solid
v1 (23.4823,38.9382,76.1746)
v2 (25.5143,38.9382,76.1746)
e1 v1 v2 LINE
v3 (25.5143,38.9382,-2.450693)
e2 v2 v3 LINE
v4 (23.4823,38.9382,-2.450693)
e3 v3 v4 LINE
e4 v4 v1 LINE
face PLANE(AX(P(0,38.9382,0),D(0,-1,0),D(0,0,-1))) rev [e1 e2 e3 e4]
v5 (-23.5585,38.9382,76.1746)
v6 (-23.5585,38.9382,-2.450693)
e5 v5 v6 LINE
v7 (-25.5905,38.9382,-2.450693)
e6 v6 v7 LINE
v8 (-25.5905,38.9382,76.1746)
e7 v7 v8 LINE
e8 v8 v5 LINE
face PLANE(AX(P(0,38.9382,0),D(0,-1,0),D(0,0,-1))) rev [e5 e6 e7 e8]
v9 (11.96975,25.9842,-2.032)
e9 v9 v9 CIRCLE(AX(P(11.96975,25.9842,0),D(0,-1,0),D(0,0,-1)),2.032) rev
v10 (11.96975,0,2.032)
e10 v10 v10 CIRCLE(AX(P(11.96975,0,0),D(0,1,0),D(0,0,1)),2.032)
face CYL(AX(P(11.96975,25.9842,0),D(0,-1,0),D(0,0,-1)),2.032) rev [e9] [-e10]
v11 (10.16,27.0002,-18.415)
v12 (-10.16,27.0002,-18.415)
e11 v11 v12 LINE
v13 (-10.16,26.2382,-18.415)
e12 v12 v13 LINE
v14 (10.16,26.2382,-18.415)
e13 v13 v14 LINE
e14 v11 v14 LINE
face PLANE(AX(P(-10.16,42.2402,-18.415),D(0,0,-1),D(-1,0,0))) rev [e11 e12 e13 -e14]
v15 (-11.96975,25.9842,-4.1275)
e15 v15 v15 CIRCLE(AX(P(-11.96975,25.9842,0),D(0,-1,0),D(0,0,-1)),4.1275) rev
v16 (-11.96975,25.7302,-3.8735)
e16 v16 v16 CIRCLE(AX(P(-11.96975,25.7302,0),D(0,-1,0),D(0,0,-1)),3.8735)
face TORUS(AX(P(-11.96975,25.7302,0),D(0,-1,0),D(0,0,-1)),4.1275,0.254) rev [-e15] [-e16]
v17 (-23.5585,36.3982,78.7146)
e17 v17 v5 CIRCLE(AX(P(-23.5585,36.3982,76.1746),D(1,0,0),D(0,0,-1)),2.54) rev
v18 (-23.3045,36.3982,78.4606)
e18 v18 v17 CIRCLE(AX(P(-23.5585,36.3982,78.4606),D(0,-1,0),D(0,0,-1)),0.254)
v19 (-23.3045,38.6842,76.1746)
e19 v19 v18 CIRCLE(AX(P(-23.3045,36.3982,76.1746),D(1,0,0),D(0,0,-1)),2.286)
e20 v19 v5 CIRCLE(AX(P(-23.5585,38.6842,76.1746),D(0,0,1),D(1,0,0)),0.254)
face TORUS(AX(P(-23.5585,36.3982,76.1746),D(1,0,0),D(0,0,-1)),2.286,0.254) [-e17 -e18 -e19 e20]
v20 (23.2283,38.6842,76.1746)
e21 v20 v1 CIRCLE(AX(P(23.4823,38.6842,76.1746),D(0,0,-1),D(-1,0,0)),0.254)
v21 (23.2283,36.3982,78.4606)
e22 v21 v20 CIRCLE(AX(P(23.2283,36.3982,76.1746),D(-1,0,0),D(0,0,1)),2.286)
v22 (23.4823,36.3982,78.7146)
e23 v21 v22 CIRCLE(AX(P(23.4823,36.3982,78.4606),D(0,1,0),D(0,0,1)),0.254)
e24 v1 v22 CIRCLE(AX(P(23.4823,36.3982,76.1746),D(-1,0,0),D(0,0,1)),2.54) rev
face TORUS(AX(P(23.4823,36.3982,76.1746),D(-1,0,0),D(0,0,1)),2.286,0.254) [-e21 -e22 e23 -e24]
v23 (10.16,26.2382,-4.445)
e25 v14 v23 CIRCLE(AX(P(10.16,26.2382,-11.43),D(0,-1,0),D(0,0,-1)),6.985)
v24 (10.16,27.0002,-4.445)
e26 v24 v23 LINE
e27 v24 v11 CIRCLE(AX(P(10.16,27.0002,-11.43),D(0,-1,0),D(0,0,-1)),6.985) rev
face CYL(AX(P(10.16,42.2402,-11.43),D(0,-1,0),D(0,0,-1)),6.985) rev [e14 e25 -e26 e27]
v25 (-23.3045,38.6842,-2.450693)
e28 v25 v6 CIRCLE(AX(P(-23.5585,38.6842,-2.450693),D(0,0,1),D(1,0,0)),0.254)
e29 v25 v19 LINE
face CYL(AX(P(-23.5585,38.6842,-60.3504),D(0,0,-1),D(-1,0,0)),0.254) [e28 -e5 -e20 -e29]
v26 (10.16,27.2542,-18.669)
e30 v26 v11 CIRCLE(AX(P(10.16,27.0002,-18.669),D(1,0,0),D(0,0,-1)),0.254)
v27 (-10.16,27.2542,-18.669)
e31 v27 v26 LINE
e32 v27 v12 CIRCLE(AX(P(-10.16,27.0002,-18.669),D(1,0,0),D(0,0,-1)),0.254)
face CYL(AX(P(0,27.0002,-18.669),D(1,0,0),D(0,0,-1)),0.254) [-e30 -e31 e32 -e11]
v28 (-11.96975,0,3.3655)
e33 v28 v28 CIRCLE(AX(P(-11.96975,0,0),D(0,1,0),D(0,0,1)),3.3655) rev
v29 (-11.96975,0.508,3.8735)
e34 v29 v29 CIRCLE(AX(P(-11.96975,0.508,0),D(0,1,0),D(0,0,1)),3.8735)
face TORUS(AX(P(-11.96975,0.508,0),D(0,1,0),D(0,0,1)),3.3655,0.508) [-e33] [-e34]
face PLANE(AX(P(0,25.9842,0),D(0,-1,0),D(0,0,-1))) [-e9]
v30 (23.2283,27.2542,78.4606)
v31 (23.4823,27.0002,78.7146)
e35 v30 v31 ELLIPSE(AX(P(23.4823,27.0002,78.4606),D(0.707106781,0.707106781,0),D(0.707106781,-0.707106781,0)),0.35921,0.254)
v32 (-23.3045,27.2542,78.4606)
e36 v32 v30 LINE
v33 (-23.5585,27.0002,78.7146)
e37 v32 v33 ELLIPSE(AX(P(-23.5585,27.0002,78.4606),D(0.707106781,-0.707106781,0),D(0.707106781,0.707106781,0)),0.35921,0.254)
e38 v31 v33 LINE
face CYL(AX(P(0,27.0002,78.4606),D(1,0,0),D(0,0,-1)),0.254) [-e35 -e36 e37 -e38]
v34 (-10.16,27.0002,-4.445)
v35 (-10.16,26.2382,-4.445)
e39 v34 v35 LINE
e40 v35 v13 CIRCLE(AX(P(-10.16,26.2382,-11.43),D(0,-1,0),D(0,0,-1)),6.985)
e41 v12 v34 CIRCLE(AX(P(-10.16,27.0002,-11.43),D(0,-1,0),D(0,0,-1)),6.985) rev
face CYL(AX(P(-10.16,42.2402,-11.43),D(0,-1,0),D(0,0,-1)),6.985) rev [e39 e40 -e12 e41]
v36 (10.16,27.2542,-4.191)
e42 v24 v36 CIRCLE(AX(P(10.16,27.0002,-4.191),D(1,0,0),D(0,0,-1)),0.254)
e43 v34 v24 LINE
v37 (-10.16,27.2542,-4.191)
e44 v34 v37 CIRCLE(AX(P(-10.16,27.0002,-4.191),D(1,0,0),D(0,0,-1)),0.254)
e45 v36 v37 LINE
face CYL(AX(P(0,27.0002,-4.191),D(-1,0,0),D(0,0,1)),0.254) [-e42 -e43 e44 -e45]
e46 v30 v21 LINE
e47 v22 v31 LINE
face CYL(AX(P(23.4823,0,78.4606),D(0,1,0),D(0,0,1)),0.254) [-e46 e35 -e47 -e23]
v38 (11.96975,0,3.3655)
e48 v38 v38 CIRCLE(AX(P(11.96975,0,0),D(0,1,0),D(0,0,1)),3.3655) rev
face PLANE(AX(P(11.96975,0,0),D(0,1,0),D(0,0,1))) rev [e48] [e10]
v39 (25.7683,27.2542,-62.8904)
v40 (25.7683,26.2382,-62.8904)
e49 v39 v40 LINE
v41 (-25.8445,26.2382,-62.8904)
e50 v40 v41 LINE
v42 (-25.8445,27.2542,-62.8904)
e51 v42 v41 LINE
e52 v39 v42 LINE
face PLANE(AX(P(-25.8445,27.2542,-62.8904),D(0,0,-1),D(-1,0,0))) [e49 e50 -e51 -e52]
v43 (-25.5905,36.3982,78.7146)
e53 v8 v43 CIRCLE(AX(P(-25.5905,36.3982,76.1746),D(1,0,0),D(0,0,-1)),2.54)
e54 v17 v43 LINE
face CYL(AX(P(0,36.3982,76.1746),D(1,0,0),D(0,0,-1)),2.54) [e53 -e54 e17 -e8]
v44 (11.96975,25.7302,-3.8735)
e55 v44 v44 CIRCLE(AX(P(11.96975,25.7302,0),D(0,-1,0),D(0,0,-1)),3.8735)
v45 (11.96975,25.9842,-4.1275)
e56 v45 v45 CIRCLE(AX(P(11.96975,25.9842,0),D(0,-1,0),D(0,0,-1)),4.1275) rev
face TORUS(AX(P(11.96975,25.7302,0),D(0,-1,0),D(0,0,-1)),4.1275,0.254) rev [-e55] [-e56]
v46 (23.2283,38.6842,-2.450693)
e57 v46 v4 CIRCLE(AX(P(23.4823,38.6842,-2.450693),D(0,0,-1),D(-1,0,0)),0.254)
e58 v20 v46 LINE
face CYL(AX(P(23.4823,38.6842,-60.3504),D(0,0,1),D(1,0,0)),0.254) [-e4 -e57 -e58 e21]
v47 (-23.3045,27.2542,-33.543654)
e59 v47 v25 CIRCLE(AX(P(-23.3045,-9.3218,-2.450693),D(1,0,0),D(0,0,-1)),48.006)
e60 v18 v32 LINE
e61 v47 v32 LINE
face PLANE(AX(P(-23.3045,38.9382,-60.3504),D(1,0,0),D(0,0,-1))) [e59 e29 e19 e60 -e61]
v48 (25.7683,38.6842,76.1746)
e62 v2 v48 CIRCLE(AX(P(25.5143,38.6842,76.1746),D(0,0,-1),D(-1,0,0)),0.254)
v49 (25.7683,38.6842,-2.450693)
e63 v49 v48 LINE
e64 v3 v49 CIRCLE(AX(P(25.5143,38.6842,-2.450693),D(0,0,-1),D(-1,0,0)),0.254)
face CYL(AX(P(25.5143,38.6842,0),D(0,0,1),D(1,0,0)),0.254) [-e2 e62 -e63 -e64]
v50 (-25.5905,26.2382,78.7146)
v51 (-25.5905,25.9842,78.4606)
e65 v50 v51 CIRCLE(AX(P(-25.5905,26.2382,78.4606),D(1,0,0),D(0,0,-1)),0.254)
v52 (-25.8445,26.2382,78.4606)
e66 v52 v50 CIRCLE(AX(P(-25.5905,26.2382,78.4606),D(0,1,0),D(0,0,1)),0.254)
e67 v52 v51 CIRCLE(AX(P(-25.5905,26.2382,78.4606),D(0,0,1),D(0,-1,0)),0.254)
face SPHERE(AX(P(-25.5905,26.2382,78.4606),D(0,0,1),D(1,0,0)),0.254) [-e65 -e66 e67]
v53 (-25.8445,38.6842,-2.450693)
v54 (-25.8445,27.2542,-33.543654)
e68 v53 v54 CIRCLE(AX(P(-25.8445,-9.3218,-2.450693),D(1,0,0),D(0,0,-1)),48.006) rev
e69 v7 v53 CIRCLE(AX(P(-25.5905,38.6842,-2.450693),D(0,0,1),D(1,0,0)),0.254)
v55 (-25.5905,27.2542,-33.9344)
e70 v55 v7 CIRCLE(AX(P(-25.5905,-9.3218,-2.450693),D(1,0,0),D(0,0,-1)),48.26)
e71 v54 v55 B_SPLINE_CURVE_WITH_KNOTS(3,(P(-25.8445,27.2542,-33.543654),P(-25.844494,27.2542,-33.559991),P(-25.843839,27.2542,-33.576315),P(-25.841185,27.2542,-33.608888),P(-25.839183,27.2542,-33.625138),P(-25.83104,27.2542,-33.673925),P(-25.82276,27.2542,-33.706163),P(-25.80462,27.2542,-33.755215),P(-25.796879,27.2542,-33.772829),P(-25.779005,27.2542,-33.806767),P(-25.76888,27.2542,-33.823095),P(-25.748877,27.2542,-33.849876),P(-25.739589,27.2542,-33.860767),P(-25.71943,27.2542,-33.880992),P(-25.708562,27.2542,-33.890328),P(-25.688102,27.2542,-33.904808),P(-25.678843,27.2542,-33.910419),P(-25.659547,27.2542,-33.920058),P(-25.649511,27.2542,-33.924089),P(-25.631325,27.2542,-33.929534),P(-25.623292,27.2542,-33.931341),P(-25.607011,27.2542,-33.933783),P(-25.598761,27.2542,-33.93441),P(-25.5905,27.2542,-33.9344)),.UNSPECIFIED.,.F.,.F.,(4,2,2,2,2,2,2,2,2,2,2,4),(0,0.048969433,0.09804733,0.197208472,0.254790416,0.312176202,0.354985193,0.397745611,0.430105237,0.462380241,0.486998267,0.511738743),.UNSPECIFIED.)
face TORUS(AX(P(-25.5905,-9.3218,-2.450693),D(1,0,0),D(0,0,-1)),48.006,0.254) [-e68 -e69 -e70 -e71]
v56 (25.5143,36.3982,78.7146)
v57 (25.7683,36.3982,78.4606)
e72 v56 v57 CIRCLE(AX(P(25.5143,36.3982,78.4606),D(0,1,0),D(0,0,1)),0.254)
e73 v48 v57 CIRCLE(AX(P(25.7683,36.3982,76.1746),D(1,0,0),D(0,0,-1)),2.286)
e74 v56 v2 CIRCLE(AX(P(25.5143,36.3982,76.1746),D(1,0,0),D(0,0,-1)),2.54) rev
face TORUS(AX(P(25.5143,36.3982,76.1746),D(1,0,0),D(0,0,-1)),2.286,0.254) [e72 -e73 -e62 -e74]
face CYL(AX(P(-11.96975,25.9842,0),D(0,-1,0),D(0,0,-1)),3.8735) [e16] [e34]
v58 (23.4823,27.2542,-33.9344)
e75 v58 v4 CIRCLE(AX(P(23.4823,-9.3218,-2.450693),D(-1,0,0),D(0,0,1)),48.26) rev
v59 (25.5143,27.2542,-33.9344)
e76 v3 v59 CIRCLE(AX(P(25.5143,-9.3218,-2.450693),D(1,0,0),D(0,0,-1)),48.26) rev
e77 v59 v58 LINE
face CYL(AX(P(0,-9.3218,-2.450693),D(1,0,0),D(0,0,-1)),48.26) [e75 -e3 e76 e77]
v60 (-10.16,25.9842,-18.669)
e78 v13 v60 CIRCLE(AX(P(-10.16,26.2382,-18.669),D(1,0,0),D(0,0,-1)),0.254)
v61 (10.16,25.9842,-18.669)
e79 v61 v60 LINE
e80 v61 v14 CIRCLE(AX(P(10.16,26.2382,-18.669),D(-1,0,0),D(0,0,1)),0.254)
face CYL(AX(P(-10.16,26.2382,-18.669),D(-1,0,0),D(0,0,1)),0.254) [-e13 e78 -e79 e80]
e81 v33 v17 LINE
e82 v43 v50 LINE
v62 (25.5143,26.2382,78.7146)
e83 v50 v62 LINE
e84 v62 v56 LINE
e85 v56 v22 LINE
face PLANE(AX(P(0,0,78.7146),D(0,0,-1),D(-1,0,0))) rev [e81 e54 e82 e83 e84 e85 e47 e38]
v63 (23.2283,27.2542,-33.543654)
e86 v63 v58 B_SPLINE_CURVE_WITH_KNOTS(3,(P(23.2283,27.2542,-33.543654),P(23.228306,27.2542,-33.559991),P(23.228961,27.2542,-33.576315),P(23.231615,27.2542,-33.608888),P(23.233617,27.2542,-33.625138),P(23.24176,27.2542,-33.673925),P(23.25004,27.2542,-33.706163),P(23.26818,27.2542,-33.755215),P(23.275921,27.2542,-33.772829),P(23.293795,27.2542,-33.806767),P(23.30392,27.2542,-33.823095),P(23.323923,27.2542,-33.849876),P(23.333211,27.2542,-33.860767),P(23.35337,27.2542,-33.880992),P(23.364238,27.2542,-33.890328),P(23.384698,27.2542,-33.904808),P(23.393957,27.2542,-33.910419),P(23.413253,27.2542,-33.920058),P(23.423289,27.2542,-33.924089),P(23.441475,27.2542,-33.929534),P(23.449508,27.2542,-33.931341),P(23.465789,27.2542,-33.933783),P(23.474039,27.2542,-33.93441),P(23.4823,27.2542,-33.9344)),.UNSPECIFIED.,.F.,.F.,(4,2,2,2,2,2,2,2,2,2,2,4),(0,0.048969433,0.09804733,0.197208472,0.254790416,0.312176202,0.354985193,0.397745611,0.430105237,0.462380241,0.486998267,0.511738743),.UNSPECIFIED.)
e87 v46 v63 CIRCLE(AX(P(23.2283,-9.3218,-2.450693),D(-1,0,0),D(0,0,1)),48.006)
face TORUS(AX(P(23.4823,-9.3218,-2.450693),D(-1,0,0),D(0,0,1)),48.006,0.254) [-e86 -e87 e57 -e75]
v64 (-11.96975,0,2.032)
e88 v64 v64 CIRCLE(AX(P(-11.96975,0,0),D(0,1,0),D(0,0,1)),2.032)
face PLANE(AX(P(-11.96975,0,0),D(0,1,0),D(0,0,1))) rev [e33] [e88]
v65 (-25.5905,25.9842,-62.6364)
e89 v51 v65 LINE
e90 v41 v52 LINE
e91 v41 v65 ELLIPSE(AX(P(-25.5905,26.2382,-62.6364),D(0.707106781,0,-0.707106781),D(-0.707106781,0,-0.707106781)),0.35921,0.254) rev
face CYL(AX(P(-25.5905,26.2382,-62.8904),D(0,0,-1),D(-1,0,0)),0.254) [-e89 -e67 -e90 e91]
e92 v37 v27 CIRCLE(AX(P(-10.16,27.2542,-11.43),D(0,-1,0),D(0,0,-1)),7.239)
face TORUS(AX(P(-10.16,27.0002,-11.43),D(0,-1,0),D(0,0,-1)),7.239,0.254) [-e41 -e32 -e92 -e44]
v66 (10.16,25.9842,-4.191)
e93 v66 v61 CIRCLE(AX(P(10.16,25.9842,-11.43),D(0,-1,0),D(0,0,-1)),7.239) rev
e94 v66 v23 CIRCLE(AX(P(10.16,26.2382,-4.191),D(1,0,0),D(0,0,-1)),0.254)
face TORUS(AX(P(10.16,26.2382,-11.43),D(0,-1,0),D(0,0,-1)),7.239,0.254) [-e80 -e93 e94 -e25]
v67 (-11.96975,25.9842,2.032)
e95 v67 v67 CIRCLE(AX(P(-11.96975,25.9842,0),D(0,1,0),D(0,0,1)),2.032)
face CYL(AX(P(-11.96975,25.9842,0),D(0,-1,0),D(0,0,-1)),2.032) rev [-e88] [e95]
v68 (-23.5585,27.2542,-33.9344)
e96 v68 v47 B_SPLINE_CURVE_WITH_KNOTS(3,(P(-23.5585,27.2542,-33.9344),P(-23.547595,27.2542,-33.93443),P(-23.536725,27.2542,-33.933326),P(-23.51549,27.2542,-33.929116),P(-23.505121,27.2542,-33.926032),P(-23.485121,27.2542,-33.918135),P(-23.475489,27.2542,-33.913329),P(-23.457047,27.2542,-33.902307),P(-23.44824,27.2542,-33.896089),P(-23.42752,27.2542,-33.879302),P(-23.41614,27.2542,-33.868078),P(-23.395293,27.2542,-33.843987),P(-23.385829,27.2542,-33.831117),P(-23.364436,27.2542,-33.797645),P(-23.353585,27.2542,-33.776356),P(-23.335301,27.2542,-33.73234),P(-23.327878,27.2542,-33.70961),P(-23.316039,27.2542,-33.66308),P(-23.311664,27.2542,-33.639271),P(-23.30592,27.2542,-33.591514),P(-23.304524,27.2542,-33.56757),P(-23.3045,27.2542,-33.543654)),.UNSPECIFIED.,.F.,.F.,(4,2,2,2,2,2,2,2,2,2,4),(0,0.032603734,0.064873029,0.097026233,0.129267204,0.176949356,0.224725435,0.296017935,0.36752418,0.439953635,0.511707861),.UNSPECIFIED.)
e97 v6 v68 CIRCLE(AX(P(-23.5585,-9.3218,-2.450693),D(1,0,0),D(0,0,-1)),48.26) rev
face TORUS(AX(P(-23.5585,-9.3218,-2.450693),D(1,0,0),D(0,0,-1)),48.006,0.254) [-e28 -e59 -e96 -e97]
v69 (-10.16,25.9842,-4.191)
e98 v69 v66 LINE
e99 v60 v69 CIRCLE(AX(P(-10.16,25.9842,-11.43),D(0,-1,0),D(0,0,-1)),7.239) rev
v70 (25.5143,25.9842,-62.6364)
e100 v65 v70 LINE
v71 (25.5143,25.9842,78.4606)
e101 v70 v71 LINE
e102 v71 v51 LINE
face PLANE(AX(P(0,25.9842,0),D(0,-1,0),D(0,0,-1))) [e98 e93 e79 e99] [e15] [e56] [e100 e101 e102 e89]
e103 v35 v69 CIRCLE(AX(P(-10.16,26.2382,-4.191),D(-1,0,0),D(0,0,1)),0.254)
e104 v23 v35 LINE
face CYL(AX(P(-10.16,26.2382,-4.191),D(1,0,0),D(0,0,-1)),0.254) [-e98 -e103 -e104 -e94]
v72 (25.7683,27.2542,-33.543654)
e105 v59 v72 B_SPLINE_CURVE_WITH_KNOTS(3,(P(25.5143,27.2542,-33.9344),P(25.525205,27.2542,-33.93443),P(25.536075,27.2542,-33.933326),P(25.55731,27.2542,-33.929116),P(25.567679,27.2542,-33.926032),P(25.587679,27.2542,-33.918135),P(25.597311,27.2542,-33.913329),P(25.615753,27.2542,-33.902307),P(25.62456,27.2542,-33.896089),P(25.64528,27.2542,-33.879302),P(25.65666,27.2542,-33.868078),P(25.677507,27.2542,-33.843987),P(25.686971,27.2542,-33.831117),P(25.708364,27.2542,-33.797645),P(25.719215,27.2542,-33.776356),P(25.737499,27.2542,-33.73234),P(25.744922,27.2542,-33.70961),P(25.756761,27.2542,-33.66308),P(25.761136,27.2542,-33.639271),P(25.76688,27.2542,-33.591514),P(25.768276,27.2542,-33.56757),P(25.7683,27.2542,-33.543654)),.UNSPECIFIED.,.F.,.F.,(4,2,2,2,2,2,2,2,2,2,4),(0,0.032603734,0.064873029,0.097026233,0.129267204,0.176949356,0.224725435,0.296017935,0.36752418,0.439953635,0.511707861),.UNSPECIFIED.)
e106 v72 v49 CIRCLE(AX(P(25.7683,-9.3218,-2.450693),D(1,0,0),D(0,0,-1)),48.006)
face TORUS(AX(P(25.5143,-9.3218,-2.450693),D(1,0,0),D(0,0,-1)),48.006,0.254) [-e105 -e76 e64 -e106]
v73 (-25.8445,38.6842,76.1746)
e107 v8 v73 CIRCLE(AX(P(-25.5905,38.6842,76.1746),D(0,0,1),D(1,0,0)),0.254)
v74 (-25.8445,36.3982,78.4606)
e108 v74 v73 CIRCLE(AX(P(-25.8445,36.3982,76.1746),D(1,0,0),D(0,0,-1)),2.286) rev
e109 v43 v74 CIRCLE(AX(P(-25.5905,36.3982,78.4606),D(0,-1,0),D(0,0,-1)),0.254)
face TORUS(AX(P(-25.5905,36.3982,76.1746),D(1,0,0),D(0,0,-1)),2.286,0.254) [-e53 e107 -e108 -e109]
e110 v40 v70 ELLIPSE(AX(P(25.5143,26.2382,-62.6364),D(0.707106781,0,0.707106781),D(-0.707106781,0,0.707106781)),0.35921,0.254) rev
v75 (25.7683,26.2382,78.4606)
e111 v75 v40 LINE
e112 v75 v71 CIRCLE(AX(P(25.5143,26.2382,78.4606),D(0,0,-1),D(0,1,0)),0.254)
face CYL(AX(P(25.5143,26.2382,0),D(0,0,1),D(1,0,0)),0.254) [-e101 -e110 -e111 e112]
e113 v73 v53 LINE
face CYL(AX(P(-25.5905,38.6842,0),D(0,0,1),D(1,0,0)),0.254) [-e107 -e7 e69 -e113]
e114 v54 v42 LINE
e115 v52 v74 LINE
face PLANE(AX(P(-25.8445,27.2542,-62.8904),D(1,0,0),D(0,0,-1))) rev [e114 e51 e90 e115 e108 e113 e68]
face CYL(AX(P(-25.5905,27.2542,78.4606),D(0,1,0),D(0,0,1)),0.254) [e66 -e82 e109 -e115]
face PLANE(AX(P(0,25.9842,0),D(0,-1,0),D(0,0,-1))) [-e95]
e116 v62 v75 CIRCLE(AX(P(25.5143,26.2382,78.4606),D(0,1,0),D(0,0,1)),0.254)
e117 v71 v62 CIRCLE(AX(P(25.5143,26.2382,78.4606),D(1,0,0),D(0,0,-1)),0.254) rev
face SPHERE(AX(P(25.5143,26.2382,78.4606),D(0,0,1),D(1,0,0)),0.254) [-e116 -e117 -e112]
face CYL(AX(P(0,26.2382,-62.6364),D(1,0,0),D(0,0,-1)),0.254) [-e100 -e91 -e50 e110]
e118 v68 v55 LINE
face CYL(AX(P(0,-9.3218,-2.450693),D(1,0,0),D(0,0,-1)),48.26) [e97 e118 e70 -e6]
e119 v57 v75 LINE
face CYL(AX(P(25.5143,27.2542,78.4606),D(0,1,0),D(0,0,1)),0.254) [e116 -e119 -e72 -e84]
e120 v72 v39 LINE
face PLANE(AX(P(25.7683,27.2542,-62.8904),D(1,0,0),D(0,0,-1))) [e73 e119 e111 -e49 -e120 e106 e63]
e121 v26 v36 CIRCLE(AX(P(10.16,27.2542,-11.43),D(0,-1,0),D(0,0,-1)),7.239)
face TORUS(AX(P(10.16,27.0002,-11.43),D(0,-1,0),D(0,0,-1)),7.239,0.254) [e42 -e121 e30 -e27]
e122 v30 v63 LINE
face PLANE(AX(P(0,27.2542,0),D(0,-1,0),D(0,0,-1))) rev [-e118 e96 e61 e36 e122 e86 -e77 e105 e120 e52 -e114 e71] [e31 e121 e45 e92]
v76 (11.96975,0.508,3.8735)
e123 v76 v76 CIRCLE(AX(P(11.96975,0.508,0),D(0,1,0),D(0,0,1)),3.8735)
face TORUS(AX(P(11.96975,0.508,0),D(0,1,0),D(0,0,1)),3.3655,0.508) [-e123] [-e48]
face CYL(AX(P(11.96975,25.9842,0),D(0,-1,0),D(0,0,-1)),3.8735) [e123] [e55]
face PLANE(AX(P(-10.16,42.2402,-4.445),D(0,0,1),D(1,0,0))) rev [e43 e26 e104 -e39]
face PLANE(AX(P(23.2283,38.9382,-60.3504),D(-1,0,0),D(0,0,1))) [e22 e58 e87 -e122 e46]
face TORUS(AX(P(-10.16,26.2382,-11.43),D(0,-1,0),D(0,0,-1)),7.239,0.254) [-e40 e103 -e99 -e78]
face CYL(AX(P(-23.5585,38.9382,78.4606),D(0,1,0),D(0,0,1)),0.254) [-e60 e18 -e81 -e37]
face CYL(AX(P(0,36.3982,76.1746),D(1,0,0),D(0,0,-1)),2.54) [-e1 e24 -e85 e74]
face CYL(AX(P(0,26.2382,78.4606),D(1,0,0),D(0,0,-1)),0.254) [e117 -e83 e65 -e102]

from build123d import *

# Parameters (mm, degrees)
SKETCH1_R             = 3.8735
SKETCH1_R_2           = 2.032
BOSS_EXTRUDE1_DEPTH   = 25.9842
BOSS_EXTRUDE1_2_DEPTH = 25.9842
SKETCH2_W             = 51.6128
SKETCH2_H             = 144.145
BOSS_EXTRUDE2_DEPTH   = 1.27
SKETCH2_3_W           = 51.6128
SKETCH2_3_H           = 144.145
SKETCH2_3_W_2         = 46.5328
SKETCH2_3_H_2         = 139.065
BOSS_EXTRUDE3_DEPTH   = 12.954
SKETCH5_W             = 51.6128
SKETCH5_H             = 11.684
CUT_EXTRUDE1_DEPTH    = 28.956
FILLET1_R             = 48.26
FILLET2_R             = 2.54
SKETCH6_W             = 51.6128
SKETCH6_H             = 12.954
CUT_EXTRUDE2_DEPTH    = 44.196
FILLET3_R             = 2.54
CUT_EXTRUDE3_DEPTH    = 16.256
FILLET4_R             = 0.254
FILLET5_R             = 0.254
FILLET6_R             = 0.254
FILLET7_R             = 0.508


with BuildPart() as part:
    # Sketch1 → Boss-Extrude1 (new body)
    with BuildSketch(Plane(origin=(0, 0, 0), x_dir=(1, 0, 0), z_dir=(0, 1, 0))):
        with Locations(Location((-11.96975, 0, 0), (0, 0, 270))):
            Circle(SKETCH1_R)
        with Locations(Location((-11.96975, 0, 0), (0, 0, 270))):
            Circle(SKETCH1_R_2, mode=Mode.SUBTRACT)
    extrude(amount=BOSS_EXTRUDE1_DEPTH)



with BuildPart() as body_2:
    # Sketch1 → Boss-Extrude1 2 (new body)
    with BuildSketch(Plane(origin=(0, 0, 0), x_dir=(1, 0, 0), z_dir=(0, 1, 0))):
        with Locations(Location((11.96975, 0, 0), (0, 0, 270))):
            Circle(SKETCH1_R)
        with Locations(Location((11.96975, 0, 0), (0, 0, 270))):
            Circle(SKETCH1_R_2, mode=Mode.SUBTRACT)
    extrude(amount=BOSS_EXTRUDE1_2_DEPTH)


with BuildPart() as part_1:
    add(part.part)

    add(body_2.part)  # Boss-Extrude2 merges body 2
    # Sketch2 → Boss-Extrude2 (add)
    with BuildSketch(Plane(origin=(0, 25.9842, 0), x_dir=(1, 0, 0), z_dir=(0, 1, 0))):
        with Locations((-0.0381, -9.1821)):
            Rectangle(SKETCH2_W, SKETCH2_H)
    extrude(amount=BOSS_EXTRUDE2_DEPTH)

    # Sketch2<3> → Boss-Extrude3 (add)
    with BuildSketch(Plane(origin=(0, 25.9842, 0), x_dir=(1, 0, 0), z_dir=(0, 1, 0))):
        with Locations((-0.0381, -9.1821)):
            Rectangle(SKETCH2_3_W, SKETCH2_3_H)
        with Locations((-0.0381, -9.1821)):
            Rectangle(SKETCH2_3_W_2, SKETCH2_3_H_2, mode=Mode.SUBTRACT)
    extrude(amount=BOSS_EXTRUDE3_DEPTH)

    # Sketch5 → Cut-Extrude1 (cut)
    with BuildSketch(Plane(origin=(0, 0, -62.8904), x_dir=(-1, 0, 0), z_dir=(0, 0, -1))):
        with Locations((0.0381, 33.0962)):
            Rectangle(SKETCH5_W, SKETCH5_H)
    extrude(amount=-CUT_EXTRUDE1_DEPTH, mode=Mode.SUBTRACT)

    # Fillet1
    # the kernel refuses this fillet: 48.26 mm, written as the material it takes off along each edge
    with BuildSketch(Plane(origin=(-55.480968196, 38.9382, -33.9344), x_dir=(0, 0, 1), z_dir=(1, 0, 0)), Plane(origin=(-104.553768196, 38.9382, -33.9344), x_dir=(0, 0, 1), z_dir=(1, 0, 0))) as fillet1_piece_1:
        with BuildLine():
            CenterArc((31.483707279, 48.26), FILLET1_R, 229.278952408, 40.721047592)
            Line((0, 11.684), (-0.629674146, 10.95248))
            ThreePointArc((-0.629674146, 10.95248), (-0.9652, 5.842), (-0.9652, 0))
            Line((-0.9652, 0), (0, -0.9652))
            Line((0, -0.9652), (31.483707279, -0.9652))
            Line((31.483707279, -0.9652), (31.483707279, 0))
        make_face()
    extrude(amount=159.958536393, mode=Mode.SUBTRACT)

    # Fillet2
    fillet2_edges = [part_1.edges().sort_by_distance(p)[0] for p in [
        (-25.8445, 32.4612, 81.2546),
        (25.7683, 32.4612, 81.2546),
    ]]
    fillet(fillet2_edges, radius=FILLET2_R)

    # Sketch6 → Cut-Extrude2 (cut)
    with BuildSketch(Plane(origin=(0, 0, 78.7146), x_dir=(-1, 0, 0), z_dir=(0, 0, -1))):
        with Locations((0.0381, 32.4612)):
            Rectangle(SKETCH6_W, SKETCH6_H)
    extrude(amount=-CUT_EXTRUDE2_DEPTH, mode=Mode.SUBTRACT)

    # Fillet3
    fillet3_edges = [part_1.edges().sort_by_distance(p)[0] for p in [
        (24.4983, 38.9382, 78.7146),
        (-24.5745, 38.9382, 78.7146),
    ]]
    fillet(fillet3_edges, radius=FILLET3_R)

    # Sketch7 → Cut-Extrude3 (cut)
    with BuildSketch(Plane.XZ.offset(-25.9842)):
        with BuildLine():
            Line((-10.16, -4.445), (10.16, -4.445))
            ThreePointArc((10.16, -4.445), (17.145, -11.43), (10.16, -18.415))
            Line((10.16, -18.415), (-10.16, -18.415))
            ThreePointArc((-10.16, -18.415), (-17.145, -11.43), (-10.16, -4.445))
        make_face()
    extrude(amount=-CUT_EXTRUDE3_DEPTH, mode=Mode.SUBTRACT)

    # Fillet4
    fillet4_edges = [part_1.edges().sort_by_distance(p)[0] for p in [
        (-25.8445, 31.1912, 78.7146),
        (-0.0381, 25.9842, 78.7146),
        (-23.3045, 31.8262, 78.7146),
        (-23.3045, 38.194251224, 77.970651224),
        (25.7683, 31.1912, 78.7146),
        (23.2283, 31.8262, 78.7146),
        (-25.8445, 38.194251224, 77.970651224),
        (23.2283, 38.9382, 36.861953639),
        (25.7683, 38.9382, 36.861953639),
        (25.7683, 38.194251224, 77.970651224),
        (23.2283, 38.194251224, 77.970651224),
        (-0.0381, 27.2542, 78.7146),
        (25.7683, 35.923008321, -19.241610505),
        (-23.3045, 38.9382, 36.861953639),
        (-25.8445, 38.9382, 36.861953639),
        (23.2283, 35.923008321, -19.241610505),
        (-23.3045, 35.923008321, -19.241610505),
        (-25.8445, 35.923008321, -19.241610505),
    ]]
    fillet(fillet4_edges, radius=FILLET4_R)

    # Fillet5
    # the kernel refuses this fillet: 0.254 mm, written as the material it adds along each edge
    with BuildSketch(Plane(origin=(11.96975, 25.9842, 0), x_dir=(0, 0, 1), z_dir=(-1, 0, 0))) as fillet5_piece_1:
        with BuildLine():
            CenterArc((3.8735 + FILLET5_R, -FILLET5_R), FILLET5_R, 90, 90)
            Line((3.8735, -FILLET5_R), (3.8735, 0))
            Line((3.8735, 0), (3.8735 + FILLET5_R, 0))
        make_face()
    revolve(axis=Axis((11.96975, 25.9842, 0), (0, 1, 0)))
    with BuildSketch(Plane(origin=(-11.96975, 25.9842, 0), x_dir=(0, 0, 1), z_dir=(-1, 0, 0))) as fillet5_piece_2:
        with BuildLine():
            CenterArc((3.8735 + FILLET5_R, -FILLET5_R), FILLET5_R, 90, 90)
            Line((3.8735, -FILLET5_R), (3.8735, 0))
            Line((3.8735, 0), (3.8735 + FILLET5_R, 0))
        make_face()
    revolve(axis=Axis((-11.96975, 25.9842, 0), (0, 1, 0)))
    # the kernel refuses this fillet: 0.254 mm, written as the material it takes off along each edge
    with BuildSketch(Plane(origin=(-25.5905, 26.2382, 78.4606), x_dir=(0, -1, 0), z_dir=(-1, 0, 0))) as fillet5_2_piece_1_section:
        Polygon((0, 0), (FILLET5_R * 1.02, 0), (FILLET5_R * 1.02, FILLET5_R * 1.02), (0, FILLET5_R * 1.02), align=None)
    fillet5_2_piece_1 = extrude(amount=FILLET5_R * 1.02, mode=Mode.PRIVATE)
    fillet5_2_piece_1 = fillet5_2_piece_1 - Plane(origin=(-25.5905, 26.2382, 78.4606), x_dir=(0, 0.7071067811865475, -0.7071067811865475), z_dir=(-1, 0, 0)) * Sphere(FILLET5_R, mode=Mode.PRIVATE)
    add(fillet5_2_piece_1, mode=Mode.SUBTRACT)
    with BuildSketch(Plane(origin=(25.5143, 26.2382, 78.4606), x_dir=(1, 0, 0), z_dir=(0, -1, 0))) as fillet5_2_piece_2_section:
        Polygon((0, 0), (FILLET5_R * 1.02, 0), (FILLET5_R * 1.02, FILLET5_R * 1.02), (0, FILLET5_R * 1.02), align=None)
    fillet5_2_piece_2 = extrude(amount=FILLET5_R * 1.02, mode=Mode.PRIVATE)
    fillet5_2_piece_2 = fillet5_2_piece_2 - Plane(origin=(25.5143, 26.2382, 78.4606), x_dir=(-0.7071067811865476, 0, -0.7071067811865475), z_dir=(0, -1, 0)) * Sphere(FILLET5_R, mode=Mode.PRIVATE)
    add(fillet5_2_piece_2, mode=Mode.SUBTRACT)
    with BuildSketch(Plane(origin=(-25.8445, 25.9842, -63.5254), x_dir=(0, 1, 0), z_dir=(0, 0, 1))) as fillet5_2_piece_3:
        with BuildLine():
            CenterArc((FILLET5_R, -FILLET5_R), FILLET5_R, 90, 90)
            Line((0, -FILLET5_R), (0, 0))
            Line((0, 0), (FILLET5_R, 0))
        make_face()
    extrude(amount=141.986, mode=Mode.SUBTRACT)
    with BuildSketch(Plane(origin=(26.4033, 25.9842, -62.8904), x_dir=(0, 0, 1), z_dir=(-1, 0, 0))) as fillet5_2_piece_4:
        with BuildLine():
            CenterArc((FILLET5_R, FILLET5_R), FILLET5_R, 180, 90)
            Line((0, FILLET5_R), (0, 0))
            Line((0, 0), (FILLET5_R, 0))
        make_face()
    extrude(amount=52.8828, mode=Mode.SUBTRACT)
    with BuildSketch(Plane(origin=(25.7683, 25.9842, 78.4606), x_dir=(-1, 0, 0), z_dir=(0, 0, -1))) as fillet5_2_piece_5:
        with BuildLine():
            CenterArc((FILLET5_R, FILLET5_R), FILLET5_R, 180, 90)
            Line((0, FILLET5_R), (0, 0))
            Line((0, 0), (FILLET5_R, 0))
        make_face()
    extrude(amount=141.986, mode=Mode.SUBTRACT)
    with BuildSketch(Plane(origin=(-10.16, 25.9842, -11.43), x_dir=(0, 0, -1), z_dir=(1, 0, 0))) as fillet5_2_piece_6:
        with BuildLine():
            CenterArc((6.985 + FILLET5_R, FILLET5_R), FILLET5_R, 180, 90)
            Line((6.985, FILLET5_R), (6.985, 0))
            Line((6.985, 0), (6.985 + FILLET5_R, 0))
        make_face()
    revolve(axis=Axis((-10.16, 25.9842, -11.43), (0, 1, 0)), revolution_arc=180, mode=Mode.SUBTRACT)
    with BuildSketch(Plane(origin=(10.16, 25.9842, -18.415), x_dir=(0, 0, -1), z_dir=(-1, 0, 0)), Plane(origin=(-10.16, 25.9842, -4.445), x_dir=(0, 0, 1), z_dir=(1, 0, 0))) as fillet5_2_piece_7:
        with BuildLine():
            CenterArc((FILLET5_R, -FILLET5_R), FILLET5_R, 90, 90)
            Line((0, -FILLET5_R), (0, 0))
            Line((0, 0), (FILLET5_R, 0))
        make_face()
    extrude(amount=20.32, mode=Mode.SUBTRACT)
    with BuildSketch(Plane(origin=(10.16, 25.9842, -11.43), x_dir=(0, 0, 1), z_dir=(-1, 0, 0))) as fillet5_2_piece_8:
        with BuildLine():
            CenterArc((6.985 + FILLET5_R, FILLET5_R), FILLET5_R, 180, 90)
            Line((6.985, FILLET5_R), (6.985, 0))
            Line((6.985, 0), (6.985 + FILLET5_R, 0))
        make_face()
    revolve(axis=Axis((10.16, 25.9842, -11.43), (0, 1, 0)), revolution_arc=180, mode=Mode.SUBTRACT)

    # Fillet6
    fillet6_edges = [part_1.edges().sort_by_distance(p)[0] for p in [
        (0, 27.2542, -18.415),
        (17.145, 27.2542, -11.43),
        (0, 27.2542, -4.445),
        (-17.145, 27.2542, -11.43),
    ]]
    fillet(fillet6_edges, radius=FILLET6_R)

    # Fillet7
    fillet7_edges = [part_1.edges().sort_by_distance(p)[0] for p in [
        (-11.96975, 0, -3.8735),
        (11.96975, 0, -3.8735),
    ]]
    fillet(fillet7_edges, radius=FILLET7_R)


solid = part_1.part
